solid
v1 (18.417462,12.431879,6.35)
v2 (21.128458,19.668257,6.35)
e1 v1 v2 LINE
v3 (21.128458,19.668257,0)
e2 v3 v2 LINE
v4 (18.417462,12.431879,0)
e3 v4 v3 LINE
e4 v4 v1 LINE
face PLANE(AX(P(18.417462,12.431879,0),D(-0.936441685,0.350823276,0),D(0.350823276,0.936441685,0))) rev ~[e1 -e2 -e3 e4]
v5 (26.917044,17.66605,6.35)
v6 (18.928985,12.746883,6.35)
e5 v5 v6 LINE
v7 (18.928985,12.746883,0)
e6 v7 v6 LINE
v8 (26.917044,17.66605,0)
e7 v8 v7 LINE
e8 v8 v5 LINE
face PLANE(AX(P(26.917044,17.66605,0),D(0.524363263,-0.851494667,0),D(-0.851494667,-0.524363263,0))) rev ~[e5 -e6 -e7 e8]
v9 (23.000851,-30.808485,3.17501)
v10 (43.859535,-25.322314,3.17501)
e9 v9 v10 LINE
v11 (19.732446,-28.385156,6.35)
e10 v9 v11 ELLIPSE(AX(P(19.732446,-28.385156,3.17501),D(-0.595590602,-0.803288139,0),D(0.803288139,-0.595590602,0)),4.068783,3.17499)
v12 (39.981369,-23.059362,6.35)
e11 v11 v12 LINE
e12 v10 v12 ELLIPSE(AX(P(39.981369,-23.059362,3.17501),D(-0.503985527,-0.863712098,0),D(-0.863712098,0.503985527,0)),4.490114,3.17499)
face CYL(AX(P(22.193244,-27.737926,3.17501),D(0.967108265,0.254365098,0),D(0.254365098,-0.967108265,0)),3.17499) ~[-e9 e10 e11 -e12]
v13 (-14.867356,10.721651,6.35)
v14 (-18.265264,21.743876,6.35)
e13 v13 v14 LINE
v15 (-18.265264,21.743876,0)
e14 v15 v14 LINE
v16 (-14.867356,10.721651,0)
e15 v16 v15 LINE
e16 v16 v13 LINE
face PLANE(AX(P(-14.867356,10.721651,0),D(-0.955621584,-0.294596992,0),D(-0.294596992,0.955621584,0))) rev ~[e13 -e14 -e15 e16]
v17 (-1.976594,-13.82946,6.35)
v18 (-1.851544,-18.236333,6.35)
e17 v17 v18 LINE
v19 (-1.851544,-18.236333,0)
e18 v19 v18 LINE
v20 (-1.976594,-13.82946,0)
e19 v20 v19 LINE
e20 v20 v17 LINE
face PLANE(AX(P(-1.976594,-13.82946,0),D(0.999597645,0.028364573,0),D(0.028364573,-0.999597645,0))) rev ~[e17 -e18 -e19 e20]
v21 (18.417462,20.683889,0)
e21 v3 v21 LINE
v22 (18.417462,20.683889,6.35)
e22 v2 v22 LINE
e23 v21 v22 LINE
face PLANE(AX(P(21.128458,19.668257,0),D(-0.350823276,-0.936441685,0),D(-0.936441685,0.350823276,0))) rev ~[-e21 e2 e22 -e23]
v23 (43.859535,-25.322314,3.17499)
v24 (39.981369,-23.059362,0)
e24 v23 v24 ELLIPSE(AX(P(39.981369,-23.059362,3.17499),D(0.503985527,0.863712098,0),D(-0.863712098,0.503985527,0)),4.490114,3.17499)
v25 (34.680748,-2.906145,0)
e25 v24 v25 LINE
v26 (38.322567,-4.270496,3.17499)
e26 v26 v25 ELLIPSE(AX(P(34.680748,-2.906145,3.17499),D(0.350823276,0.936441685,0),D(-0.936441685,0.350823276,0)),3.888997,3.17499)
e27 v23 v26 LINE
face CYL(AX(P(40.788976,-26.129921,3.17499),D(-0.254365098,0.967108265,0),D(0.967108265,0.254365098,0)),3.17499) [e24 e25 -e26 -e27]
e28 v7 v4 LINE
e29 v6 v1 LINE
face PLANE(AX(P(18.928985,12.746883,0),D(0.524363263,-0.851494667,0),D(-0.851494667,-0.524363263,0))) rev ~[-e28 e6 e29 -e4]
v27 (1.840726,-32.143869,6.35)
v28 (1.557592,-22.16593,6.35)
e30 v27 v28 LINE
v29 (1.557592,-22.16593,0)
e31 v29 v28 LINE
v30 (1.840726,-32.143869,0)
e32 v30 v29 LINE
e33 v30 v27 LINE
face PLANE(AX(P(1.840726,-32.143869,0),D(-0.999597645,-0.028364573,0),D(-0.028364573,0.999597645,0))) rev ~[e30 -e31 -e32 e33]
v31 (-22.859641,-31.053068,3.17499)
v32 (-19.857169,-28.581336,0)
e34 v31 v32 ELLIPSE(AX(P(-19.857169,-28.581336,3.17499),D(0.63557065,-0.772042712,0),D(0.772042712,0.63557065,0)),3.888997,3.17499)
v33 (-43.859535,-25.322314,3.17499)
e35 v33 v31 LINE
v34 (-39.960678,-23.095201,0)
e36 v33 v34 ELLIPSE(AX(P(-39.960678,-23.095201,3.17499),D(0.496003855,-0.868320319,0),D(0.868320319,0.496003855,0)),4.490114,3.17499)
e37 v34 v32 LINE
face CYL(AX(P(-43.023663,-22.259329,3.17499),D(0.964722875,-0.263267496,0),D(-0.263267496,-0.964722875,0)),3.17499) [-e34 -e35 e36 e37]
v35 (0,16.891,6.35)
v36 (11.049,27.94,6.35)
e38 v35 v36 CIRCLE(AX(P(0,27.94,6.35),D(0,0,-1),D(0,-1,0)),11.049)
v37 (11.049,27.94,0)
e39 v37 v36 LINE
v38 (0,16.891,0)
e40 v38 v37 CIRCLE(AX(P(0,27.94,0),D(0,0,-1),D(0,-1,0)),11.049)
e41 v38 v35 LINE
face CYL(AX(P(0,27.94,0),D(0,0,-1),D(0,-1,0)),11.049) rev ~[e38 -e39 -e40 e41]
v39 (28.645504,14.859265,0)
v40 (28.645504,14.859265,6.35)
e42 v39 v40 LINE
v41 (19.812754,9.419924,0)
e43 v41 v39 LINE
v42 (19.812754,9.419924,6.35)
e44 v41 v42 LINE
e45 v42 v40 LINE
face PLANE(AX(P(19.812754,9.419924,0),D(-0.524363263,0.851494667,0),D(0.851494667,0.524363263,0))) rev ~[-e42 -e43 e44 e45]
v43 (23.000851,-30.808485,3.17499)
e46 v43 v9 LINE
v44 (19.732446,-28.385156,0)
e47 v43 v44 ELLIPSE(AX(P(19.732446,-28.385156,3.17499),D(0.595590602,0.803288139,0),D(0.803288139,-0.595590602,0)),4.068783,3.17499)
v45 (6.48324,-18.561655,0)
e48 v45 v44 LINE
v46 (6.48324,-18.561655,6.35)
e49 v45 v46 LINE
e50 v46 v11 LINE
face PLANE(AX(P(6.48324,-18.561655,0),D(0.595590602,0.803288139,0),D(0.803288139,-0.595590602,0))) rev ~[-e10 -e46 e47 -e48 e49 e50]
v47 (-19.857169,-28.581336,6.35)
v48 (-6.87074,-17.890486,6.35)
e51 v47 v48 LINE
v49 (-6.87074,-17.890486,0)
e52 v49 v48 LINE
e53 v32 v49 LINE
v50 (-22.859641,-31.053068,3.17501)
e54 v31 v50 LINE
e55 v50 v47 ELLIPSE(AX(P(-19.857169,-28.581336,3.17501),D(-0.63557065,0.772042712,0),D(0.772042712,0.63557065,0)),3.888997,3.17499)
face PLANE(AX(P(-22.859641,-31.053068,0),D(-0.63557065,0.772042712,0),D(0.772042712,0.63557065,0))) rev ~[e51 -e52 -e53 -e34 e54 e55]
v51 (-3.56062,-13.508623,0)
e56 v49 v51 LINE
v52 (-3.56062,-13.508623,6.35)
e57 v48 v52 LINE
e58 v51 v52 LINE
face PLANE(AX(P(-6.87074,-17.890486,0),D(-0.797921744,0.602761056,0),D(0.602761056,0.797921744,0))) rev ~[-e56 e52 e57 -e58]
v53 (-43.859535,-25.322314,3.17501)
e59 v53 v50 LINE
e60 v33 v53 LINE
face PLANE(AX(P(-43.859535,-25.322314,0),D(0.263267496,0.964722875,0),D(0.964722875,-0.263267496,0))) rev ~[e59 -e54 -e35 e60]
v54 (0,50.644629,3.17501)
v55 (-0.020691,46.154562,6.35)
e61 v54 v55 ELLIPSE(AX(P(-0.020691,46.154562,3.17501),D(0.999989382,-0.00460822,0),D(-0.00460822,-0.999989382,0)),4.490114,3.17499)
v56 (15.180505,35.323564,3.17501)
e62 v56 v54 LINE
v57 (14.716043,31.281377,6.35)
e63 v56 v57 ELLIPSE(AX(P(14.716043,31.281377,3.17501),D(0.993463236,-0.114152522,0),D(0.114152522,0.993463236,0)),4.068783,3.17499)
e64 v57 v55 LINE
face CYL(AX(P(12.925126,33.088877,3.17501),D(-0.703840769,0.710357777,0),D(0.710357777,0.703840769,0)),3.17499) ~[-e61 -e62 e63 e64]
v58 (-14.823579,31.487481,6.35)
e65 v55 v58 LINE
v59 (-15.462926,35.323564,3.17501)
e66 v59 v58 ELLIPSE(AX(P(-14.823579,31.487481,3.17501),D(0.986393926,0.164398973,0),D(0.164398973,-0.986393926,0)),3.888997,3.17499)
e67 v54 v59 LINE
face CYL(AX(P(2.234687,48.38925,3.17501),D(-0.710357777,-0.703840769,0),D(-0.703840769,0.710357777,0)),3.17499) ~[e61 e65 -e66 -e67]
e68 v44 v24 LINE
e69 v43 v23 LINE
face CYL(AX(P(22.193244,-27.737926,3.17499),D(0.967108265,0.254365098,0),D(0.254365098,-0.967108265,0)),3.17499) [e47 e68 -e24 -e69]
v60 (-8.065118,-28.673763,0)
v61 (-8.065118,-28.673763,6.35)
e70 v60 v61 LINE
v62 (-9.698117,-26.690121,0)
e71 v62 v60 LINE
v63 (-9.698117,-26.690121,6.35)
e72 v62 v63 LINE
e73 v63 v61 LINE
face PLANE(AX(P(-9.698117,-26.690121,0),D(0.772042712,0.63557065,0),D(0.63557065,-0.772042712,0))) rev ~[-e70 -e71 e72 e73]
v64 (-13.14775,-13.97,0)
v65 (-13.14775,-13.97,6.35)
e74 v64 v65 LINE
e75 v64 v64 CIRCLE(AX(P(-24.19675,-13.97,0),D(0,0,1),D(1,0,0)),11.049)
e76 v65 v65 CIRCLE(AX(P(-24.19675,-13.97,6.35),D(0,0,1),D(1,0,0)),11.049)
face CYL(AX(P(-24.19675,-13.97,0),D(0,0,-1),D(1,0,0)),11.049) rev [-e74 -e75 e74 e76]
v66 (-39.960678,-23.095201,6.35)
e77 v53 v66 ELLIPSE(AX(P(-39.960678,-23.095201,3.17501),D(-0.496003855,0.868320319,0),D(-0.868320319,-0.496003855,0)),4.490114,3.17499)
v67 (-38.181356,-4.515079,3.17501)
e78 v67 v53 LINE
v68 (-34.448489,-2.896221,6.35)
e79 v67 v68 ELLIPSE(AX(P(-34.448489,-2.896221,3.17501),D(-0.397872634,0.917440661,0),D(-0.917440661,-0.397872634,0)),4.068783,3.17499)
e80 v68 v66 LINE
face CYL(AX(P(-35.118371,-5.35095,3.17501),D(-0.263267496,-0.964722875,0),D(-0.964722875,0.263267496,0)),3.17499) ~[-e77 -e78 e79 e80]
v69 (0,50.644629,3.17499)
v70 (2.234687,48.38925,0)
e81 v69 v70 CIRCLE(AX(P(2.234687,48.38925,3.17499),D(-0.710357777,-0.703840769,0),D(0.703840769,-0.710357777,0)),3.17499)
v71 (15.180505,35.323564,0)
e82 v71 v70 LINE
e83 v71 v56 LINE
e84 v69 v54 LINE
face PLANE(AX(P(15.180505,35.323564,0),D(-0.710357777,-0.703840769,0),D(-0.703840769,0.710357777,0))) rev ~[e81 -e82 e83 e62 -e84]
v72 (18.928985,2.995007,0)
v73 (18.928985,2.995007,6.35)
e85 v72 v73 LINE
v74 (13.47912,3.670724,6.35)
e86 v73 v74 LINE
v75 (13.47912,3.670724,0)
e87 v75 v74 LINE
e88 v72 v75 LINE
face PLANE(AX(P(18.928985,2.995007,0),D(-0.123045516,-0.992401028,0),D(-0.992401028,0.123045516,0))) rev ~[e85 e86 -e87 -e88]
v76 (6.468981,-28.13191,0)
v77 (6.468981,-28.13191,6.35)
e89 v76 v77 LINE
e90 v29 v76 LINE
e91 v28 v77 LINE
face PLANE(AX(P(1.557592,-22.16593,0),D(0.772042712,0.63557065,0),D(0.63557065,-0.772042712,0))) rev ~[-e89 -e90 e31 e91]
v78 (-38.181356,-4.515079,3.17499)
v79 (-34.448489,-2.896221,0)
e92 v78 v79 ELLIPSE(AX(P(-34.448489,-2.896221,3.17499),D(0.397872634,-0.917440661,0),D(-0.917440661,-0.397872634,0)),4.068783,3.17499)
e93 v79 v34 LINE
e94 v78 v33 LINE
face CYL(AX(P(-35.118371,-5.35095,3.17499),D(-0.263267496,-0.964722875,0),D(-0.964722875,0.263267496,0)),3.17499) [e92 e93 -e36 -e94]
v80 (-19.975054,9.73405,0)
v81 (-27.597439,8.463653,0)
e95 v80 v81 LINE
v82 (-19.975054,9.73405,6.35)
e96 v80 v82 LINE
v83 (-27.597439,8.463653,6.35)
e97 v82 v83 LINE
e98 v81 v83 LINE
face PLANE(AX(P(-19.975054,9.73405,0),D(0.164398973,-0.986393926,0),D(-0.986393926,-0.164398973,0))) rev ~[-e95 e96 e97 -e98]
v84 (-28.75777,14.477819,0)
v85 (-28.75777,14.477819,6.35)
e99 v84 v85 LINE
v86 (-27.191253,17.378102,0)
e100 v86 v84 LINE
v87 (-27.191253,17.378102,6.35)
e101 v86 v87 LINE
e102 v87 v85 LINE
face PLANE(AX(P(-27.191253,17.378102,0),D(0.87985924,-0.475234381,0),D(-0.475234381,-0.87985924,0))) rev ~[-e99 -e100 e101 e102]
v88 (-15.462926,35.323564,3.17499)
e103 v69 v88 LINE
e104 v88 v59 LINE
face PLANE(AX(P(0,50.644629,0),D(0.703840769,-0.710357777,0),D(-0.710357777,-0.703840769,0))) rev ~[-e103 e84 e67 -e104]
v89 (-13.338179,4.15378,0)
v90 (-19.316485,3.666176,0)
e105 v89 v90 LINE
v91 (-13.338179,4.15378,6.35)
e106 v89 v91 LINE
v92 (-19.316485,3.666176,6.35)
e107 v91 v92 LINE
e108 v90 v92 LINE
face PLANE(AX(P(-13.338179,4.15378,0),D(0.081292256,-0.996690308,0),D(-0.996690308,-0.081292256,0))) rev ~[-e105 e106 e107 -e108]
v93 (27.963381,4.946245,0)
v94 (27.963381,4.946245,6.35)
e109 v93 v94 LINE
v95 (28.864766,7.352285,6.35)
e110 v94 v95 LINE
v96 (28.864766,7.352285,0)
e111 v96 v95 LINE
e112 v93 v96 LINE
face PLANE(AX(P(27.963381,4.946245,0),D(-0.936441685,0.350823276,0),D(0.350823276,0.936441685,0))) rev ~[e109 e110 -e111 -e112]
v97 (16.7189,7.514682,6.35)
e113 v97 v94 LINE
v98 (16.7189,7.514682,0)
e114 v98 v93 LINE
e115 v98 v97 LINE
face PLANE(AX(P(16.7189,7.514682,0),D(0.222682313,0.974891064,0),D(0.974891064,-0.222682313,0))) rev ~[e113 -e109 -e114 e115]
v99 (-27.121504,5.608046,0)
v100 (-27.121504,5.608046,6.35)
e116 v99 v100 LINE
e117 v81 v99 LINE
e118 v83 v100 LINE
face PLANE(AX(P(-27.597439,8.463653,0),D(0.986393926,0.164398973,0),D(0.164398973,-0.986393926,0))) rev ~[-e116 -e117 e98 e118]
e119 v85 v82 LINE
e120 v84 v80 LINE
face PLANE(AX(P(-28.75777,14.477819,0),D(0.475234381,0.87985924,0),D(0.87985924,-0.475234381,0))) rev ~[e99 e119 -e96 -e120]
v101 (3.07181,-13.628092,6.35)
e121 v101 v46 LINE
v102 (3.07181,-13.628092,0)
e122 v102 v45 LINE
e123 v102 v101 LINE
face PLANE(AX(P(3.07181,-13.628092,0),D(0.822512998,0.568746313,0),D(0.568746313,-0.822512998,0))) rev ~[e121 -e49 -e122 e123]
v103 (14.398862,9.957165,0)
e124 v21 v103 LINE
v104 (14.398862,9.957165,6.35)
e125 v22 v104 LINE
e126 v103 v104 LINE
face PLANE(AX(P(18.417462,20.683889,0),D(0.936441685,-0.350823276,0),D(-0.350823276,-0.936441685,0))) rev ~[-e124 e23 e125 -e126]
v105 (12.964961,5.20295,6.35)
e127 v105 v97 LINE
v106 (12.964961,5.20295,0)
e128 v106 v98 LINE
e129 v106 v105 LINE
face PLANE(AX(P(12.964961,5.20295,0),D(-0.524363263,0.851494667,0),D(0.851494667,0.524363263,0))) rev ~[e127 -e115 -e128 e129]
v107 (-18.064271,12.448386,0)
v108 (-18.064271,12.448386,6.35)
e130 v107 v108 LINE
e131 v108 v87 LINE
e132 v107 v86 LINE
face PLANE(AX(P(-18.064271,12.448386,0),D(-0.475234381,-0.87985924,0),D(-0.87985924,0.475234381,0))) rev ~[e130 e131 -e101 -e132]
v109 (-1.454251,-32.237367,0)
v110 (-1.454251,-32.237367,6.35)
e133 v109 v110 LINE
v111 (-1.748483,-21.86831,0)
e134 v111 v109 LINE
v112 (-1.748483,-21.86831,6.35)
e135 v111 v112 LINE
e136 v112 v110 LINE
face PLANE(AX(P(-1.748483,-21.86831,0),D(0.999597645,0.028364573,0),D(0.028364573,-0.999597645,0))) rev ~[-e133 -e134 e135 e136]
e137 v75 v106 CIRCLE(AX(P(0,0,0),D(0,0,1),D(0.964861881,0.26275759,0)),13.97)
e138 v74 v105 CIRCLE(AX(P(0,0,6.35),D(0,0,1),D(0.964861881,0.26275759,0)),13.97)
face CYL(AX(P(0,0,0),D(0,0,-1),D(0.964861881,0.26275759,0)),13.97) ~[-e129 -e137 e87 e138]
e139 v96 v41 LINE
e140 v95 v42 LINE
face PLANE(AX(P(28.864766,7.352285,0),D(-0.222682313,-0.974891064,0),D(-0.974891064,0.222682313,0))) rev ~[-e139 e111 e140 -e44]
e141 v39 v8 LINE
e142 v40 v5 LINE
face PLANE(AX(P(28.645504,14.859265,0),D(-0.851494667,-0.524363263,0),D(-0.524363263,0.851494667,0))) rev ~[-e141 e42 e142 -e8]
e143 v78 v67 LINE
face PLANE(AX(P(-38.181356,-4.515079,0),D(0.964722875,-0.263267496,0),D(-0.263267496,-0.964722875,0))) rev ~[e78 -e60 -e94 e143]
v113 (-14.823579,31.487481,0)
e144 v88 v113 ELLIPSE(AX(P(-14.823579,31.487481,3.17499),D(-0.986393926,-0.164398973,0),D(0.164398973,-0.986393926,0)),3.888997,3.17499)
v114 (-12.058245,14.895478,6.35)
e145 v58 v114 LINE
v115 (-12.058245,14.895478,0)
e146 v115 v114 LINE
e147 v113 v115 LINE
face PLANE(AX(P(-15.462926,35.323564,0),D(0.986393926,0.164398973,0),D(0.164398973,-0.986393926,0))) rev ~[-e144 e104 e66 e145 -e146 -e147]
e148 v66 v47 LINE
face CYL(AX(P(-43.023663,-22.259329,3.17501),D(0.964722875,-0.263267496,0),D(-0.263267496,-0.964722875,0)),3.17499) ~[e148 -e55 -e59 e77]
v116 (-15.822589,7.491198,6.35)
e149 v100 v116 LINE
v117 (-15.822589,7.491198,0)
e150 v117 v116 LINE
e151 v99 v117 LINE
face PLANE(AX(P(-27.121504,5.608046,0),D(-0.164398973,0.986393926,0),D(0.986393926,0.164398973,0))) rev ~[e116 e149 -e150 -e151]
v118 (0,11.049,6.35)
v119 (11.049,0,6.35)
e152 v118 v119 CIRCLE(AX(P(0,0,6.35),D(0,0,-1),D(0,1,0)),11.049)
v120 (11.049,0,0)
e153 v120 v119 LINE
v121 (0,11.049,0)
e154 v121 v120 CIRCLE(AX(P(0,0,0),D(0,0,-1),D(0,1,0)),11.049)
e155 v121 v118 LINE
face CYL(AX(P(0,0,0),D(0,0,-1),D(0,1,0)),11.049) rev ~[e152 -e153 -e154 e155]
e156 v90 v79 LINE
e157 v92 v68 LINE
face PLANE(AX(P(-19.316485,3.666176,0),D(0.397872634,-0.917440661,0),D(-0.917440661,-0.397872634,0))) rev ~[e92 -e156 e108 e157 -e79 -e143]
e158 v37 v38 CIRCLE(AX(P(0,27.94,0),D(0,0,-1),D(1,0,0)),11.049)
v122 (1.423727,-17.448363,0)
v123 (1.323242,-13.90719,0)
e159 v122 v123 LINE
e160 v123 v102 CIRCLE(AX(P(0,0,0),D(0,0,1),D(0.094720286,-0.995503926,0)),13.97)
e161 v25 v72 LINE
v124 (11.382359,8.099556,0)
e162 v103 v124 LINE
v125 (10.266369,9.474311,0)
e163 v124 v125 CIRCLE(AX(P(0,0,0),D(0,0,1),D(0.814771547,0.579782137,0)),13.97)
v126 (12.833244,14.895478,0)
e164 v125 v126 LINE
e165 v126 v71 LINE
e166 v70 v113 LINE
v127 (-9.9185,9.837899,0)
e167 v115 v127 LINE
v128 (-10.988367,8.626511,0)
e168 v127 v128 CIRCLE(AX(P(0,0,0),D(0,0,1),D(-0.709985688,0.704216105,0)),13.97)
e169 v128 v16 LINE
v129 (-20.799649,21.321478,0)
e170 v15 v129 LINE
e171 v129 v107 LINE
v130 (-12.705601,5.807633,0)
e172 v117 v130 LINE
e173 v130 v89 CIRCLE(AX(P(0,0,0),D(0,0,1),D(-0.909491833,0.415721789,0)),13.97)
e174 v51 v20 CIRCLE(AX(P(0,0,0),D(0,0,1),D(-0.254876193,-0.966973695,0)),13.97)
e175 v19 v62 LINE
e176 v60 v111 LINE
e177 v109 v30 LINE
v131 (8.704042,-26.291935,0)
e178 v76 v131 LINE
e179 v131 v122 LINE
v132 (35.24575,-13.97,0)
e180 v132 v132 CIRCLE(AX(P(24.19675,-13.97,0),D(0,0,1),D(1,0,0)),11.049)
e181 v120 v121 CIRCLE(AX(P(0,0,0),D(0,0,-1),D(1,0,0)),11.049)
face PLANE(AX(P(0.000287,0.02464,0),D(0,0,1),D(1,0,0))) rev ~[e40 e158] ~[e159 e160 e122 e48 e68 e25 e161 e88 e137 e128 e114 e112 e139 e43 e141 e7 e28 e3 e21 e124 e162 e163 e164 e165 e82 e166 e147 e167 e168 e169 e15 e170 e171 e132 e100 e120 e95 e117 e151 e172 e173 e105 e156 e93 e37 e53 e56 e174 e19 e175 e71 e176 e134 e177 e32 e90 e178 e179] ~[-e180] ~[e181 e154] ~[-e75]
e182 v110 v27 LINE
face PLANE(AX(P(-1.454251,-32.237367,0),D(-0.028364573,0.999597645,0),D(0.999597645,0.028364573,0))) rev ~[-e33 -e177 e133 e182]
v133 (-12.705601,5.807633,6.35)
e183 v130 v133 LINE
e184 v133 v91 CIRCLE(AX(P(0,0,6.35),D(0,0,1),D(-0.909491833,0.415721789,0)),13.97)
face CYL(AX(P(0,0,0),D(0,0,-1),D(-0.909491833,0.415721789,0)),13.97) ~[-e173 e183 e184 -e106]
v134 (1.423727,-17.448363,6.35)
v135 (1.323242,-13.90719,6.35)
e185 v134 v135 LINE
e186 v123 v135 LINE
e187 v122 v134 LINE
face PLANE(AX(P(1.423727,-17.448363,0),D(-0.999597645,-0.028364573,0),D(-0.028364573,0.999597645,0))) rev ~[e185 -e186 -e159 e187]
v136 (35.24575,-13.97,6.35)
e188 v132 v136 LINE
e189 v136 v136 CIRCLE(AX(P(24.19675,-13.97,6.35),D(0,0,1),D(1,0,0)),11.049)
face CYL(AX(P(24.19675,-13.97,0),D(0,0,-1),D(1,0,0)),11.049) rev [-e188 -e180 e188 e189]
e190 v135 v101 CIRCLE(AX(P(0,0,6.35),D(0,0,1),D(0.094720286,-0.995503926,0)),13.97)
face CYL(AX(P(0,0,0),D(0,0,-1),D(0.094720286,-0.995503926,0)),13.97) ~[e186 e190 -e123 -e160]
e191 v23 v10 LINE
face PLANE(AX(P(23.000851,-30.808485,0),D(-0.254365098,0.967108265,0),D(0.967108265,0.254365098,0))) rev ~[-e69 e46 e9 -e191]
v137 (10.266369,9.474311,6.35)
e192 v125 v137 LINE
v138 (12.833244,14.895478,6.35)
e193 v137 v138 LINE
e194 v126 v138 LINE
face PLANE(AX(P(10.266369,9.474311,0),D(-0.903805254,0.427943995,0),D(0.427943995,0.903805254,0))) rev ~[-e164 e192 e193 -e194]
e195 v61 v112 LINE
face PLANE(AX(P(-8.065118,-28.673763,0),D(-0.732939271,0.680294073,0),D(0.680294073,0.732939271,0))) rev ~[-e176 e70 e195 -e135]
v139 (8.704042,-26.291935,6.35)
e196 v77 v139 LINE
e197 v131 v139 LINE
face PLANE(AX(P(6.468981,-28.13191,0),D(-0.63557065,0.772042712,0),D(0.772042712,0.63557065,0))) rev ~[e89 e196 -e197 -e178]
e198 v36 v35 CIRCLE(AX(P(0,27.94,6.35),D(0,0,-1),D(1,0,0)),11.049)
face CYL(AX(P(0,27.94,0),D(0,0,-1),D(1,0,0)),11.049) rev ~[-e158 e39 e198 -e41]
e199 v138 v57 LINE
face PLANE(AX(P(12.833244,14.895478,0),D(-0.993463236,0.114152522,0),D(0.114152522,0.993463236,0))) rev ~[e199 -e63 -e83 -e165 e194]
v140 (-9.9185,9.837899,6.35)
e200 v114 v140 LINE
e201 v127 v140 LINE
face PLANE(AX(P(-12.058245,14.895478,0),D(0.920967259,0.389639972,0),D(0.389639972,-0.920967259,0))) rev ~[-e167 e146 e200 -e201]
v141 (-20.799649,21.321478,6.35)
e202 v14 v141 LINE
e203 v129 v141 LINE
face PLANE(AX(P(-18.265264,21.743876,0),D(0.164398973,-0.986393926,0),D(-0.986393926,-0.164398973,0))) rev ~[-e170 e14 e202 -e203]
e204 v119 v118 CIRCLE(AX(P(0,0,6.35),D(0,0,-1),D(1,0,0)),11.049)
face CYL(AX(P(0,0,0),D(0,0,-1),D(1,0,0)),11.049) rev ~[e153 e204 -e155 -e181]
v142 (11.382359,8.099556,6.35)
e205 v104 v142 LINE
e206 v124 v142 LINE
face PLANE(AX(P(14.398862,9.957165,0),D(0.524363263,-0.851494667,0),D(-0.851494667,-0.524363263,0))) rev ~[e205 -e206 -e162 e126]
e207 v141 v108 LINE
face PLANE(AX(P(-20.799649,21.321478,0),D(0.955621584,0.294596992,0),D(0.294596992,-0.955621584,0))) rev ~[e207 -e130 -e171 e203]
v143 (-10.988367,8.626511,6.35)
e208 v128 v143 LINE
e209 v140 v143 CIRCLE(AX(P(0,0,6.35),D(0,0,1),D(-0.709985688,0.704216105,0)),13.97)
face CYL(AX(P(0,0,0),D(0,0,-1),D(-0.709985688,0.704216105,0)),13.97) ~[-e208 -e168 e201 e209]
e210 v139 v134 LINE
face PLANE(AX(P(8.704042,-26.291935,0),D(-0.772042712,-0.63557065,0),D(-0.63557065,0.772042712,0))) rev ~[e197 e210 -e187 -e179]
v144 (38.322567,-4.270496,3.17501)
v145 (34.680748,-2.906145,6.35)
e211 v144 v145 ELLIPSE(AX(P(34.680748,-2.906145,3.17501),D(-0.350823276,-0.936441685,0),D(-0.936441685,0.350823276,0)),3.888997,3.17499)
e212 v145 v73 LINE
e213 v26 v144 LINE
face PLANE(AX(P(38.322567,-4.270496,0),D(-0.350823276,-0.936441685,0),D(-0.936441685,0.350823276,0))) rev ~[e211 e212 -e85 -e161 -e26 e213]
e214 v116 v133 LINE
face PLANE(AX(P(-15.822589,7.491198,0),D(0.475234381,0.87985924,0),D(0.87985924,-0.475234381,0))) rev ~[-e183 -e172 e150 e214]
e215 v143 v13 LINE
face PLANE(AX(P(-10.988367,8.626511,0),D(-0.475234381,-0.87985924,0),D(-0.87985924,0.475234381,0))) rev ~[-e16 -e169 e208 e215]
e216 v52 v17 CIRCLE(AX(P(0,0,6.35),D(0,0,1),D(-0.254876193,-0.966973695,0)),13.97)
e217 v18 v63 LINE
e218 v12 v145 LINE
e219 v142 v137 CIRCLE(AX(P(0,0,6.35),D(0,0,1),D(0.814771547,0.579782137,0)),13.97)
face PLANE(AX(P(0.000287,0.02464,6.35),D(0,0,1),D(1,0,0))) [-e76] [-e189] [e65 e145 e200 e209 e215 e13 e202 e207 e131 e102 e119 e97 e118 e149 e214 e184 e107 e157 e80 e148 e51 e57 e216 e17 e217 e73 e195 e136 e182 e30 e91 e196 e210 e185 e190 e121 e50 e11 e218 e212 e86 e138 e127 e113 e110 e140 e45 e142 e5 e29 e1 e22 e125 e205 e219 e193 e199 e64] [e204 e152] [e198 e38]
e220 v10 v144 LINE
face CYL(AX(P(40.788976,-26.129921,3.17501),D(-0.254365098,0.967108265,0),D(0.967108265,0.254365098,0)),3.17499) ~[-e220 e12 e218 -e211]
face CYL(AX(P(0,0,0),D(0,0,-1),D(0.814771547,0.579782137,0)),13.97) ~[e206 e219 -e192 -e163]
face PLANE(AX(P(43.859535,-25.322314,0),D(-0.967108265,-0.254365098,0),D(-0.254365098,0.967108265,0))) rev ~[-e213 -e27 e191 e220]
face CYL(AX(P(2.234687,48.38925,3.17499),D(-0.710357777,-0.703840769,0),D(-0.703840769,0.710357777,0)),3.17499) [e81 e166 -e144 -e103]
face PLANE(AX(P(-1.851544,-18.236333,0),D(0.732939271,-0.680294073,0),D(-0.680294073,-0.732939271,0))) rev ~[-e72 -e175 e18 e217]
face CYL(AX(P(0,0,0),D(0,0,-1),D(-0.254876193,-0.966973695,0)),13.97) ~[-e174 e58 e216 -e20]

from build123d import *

# Parameters (mm, degrees)
F0_R     = 11.049
F1_DEPTH = 6.35
F2_R     = 3.17499


# Not quite as in the source:
# - a fillet or chamfer is up to 0.001 mm smaller than in the source, because OpenCascade refuses the exact size


with BuildPart() as f1:
    # F0 (on Top) → F1 (new body)
    with BuildSketch(Plane.XY):
        with BuildLine():
            ThreePointArc((10.266368543, 9.474311423), (5.6037830713, 12.7968166076), (0, 13.97))
            ThreePointArc((0, 13.97), (-5.3724040771, 12.8956649473), (-9.9185000629, 9.8378989882))
            ThreePointArc((-9.9185000629, 9.8378989882), (-10.4709665549, 9.247689409), (-10.9883672437, 8.6265106107))
            Line((-10.9883672437, 8.6265106107), (-14.8673558727, 10.7216511471))
            Line((-14.8673558727, 10.7216511471), (-18.2652639065, 21.743875915))
            Line((-18.2652639065, 21.743875915), (-20.7996486885, 21.3214784899))
            Line((-20.7996486885, 21.3214784899), (-18.0642706589, 12.4483862321))
            Line((-18.0642706589, 12.4483862321), (-27.1912532422, 17.3781019425))
            Line((-27.1912532422, 17.3781019425), (-28.7577700617, 14.4778187277))
            Line((-28.7577700617, 14.4778187277), (-19.9750544664, 9.7340503842))
            Line((-19.9750544664, 9.7340503842), (-27.5974388749, 8.4636530986))
            Line((-27.5974388749, 8.4636530986), (-27.1215043395, 5.6080456262))
            Line((-27.1215043395, 5.6080456262), (-15.8225889535, 7.4911980188))
            Line((-15.8225889535, 7.4911980188), (-12.7056009028, 5.8076333991))
            ThreePointArc((-12.7056009028, 5.8076333991), (-13.0481194381, 4.9907393369), (-13.3381786472, 4.1537802513))
            ThreePointArc((-13.3381786472, 4.1537802513), (-12.2222121685, -6.7659758874), (-3.5606204122, -13.508622516))
            ThreePointArc((-3.5606204122, -13.508622516), (-2.773250677, -13.6919677433), (-1.9765937131, -13.8294604845))
            Line((-1.9765937131, -13.8294604845), (-1.8515443275, -18.2363334465))
            Line((-1.8515443275, -18.2363334465), (-9.6981169659, -26.6901205073))
            Line((-9.6981169659, -26.6901205073), (-8.0651176742, -28.6737633989))
            Line((-8.0651176742, -28.6737633989), (-1.7484833836, -21.8683104075))
            Line((-1.7484833836, -21.8683104075), (-1.4542511306, -32.2373670397))
            Line((-1.4542511306, -32.2373670397), (1.8407262213, -32.1438687935))
            Line((1.8407262213, -32.1438687935), (1.5575923187, -22.165929802))
            Line((1.5575923187, -22.165929802), (6.4689808452, -28.1319096943))
            Line((6.4689808452, -28.1319096943), (8.7040421919, -26.29193456))
            Line((8.7040421919, -26.29193456), (1.4237266877, -17.4483629968))
            Line((1.4237266877, -17.4483629968), (1.323242392, -13.9071898517))
            ThreePointArc((1.323242392, -13.9071898517), (2.2019526696, -13.7953725735), (3.0718101042, -13.6280916743))
            ThreePointArc((3.0718101042, -13.6280916743), (11.9706130841, -7.2017582846), (13.4791204751, 3.6707235278))
            ThreePointArc((13.4791204751, 3.6707235278), (13.244217232, 4.4442783342), (12.9649609568, 5.2029498738))
            Line((12.9649609568, 5.2029498738), (16.7189002003, 7.5146822993))
            Line((16.7189002003, 7.5146822993), (27.9633808724, 4.9462445923))
            Line((27.9633808724, 4.9462445923), (28.8647663627, 7.3522849091))
            Line((28.8647663627, 7.3522849091), (19.8127540426, 9.4199241754))
            Line((19.8127540426, 9.4199241754), (28.6455043728, 14.8592650972))
            Line((28.6455043728, 14.8592650972), (26.9170438404, 17.6660500658))
            Line((26.9170438404, 17.6660500658), (18.9289850868, 12.7468829615))
            Line((18.9289850868, 12.7468829615), (18.4174621476, 12.4318794178))
            Line((18.4174621476, 12.4318794178), (21.1284580297, 19.6682565957))
            Line((21.1284580297, 19.6682565957), (18.4174621476, 20.6838889338))
            Line((18.4174621476, 20.6838889338), (14.3988622659, 9.957164978))
            Line((14.3988622659, 9.957164978), (11.3823585109, 8.0995564527))
            ThreePointArc((11.3823585109, 8.0995564527), (10.8461667685, 8.8046332365), (10.266368543, 9.474311423))
        make_face()
        with BuildLine():
            ThreePointArc((0, 11.049), (7.8128228253, 7.8128228253), (11.049, 0))
            ThreePointArc((11.049, 0), (-7.8128228253, -7.8128228253), (0, 11.049))
        make_face(mode=Mode.SUBTRACT)
        with BuildLine():
            ThreePointArc((-9.9185000629, 9.8378989882), (-5.3724040771, 12.8956649473), (0, 13.97))
            ThreePointArc((0, 13.97), (5.6037830713, 12.7968166076), (10.266368543, 9.474311423))
            Line((10.266368543, 9.474311423), (12.8332442979, 14.8954782635))
            Line((12.8332442979, 14.8954782635), (15.1805052923, 35.3235639632))
            Line((15.1805052923, 35.3235639632), (0, 50.6446287036))
            Line((0, 50.6446287036), (-15.4629256576, 35.3235639632))
            Line((-15.4629256576, 35.3235639632), (-12.0582450181, 14.8954782635))
            Line((-12.0582450181, 14.8954782635), (-9.9185000629, 9.8378989882))
        make_face()
        with BuildLine():
            ThreePointArc((11.049, 27.94), (7.8128228253, 20.1271771747), (0, 16.891))
            ThreePointArc((0, 16.891), (-7.8128228253, 35.7528228253), (11.049, 27.94))
        make_face(mode=Mode.SUBTRACT)
        with BuildLine():
            ThreePointArc((-3.5606204122, -13.508622516), (-12.2222121685, -6.7659758874), (-13.3381786472, 4.1537802513))
            Line((-13.3381786472, 4.1537802513), (-19.3164847266, 3.6661764432))
            Line((-19.3164847266, 3.6661764432), (-38.1813563905, -4.5150787562))
            Line((-38.1813563905, -4.5150787562), (-43.8595350225, -25.3223143518))
            Line((-43.8595350225, -25.3223143518), (-22.8596409155, -31.0530684179))
            Line((-22.8596409155, -31.0530684179), (-6.8707400686, -17.8904856425))
            Line((-6.8707400686, -17.8904856425), (-3.5606204122, -13.508622516))
        make_face()
        with Locations((-24.1967497817, -13.97)):
            Circle(F0_R, mode=Mode.SUBTRACT)
        with BuildLine():
            Line((18.9289850868, 2.995007379), (13.4791204751, 3.6707235278))
            ThreePointArc((13.4791204751, 3.6707235278), (11.9706130841, -7.2017582846), (3.0718101042, -13.6280916743))
            Line((3.0718101042, -13.6280916743), (6.4832404288, -18.5616547067))
            Line((6.4832404288, -18.5616547067), (23.0008510982, -30.808485207))
            Line((23.0008510982, -30.808485207), (43.8595350225, -25.3223143518))
            Line((43.8595350225, -25.3223143518), (38.3225665731, -4.2704955452))
            Line((38.3225665731, -4.2704955452), (18.9289850868, 2.995007379))
        make_face()
        with Locations((24.1967497817, -13.97)):
            Circle(F0_R, mode=Mode.SUBTRACT)
    extrude(amount=F1_DEPTH)

    # F2 (radius 3.175 in the source; OpenCascade refuses exactly that, so slightly less here)
    f2_edges = [f1.edges().sort_by_distance(p)[0] for p in [
        (-7.731463, 42.984096, 6.35),
        (7.590253, 42.984096, 6.35),
        (41.091051, -14.796405, 6.35),
        (33.430193, -28.0654, 6.35),
        (-41.020446, -14.918697, 6.35),
        (-33.359588, -28.187691, 6.35),
        (-33.359588, -28.187691, 0),
        (-41.020446, -14.918697, 0),
        (-7.731463, 42.984096, 0),
        (41.091051, -14.796405, 0),
        (33.430193, -28.0654, 0),
    ]]
    fillet(f2_edges, radius=F2_R)


solid = f1.part
